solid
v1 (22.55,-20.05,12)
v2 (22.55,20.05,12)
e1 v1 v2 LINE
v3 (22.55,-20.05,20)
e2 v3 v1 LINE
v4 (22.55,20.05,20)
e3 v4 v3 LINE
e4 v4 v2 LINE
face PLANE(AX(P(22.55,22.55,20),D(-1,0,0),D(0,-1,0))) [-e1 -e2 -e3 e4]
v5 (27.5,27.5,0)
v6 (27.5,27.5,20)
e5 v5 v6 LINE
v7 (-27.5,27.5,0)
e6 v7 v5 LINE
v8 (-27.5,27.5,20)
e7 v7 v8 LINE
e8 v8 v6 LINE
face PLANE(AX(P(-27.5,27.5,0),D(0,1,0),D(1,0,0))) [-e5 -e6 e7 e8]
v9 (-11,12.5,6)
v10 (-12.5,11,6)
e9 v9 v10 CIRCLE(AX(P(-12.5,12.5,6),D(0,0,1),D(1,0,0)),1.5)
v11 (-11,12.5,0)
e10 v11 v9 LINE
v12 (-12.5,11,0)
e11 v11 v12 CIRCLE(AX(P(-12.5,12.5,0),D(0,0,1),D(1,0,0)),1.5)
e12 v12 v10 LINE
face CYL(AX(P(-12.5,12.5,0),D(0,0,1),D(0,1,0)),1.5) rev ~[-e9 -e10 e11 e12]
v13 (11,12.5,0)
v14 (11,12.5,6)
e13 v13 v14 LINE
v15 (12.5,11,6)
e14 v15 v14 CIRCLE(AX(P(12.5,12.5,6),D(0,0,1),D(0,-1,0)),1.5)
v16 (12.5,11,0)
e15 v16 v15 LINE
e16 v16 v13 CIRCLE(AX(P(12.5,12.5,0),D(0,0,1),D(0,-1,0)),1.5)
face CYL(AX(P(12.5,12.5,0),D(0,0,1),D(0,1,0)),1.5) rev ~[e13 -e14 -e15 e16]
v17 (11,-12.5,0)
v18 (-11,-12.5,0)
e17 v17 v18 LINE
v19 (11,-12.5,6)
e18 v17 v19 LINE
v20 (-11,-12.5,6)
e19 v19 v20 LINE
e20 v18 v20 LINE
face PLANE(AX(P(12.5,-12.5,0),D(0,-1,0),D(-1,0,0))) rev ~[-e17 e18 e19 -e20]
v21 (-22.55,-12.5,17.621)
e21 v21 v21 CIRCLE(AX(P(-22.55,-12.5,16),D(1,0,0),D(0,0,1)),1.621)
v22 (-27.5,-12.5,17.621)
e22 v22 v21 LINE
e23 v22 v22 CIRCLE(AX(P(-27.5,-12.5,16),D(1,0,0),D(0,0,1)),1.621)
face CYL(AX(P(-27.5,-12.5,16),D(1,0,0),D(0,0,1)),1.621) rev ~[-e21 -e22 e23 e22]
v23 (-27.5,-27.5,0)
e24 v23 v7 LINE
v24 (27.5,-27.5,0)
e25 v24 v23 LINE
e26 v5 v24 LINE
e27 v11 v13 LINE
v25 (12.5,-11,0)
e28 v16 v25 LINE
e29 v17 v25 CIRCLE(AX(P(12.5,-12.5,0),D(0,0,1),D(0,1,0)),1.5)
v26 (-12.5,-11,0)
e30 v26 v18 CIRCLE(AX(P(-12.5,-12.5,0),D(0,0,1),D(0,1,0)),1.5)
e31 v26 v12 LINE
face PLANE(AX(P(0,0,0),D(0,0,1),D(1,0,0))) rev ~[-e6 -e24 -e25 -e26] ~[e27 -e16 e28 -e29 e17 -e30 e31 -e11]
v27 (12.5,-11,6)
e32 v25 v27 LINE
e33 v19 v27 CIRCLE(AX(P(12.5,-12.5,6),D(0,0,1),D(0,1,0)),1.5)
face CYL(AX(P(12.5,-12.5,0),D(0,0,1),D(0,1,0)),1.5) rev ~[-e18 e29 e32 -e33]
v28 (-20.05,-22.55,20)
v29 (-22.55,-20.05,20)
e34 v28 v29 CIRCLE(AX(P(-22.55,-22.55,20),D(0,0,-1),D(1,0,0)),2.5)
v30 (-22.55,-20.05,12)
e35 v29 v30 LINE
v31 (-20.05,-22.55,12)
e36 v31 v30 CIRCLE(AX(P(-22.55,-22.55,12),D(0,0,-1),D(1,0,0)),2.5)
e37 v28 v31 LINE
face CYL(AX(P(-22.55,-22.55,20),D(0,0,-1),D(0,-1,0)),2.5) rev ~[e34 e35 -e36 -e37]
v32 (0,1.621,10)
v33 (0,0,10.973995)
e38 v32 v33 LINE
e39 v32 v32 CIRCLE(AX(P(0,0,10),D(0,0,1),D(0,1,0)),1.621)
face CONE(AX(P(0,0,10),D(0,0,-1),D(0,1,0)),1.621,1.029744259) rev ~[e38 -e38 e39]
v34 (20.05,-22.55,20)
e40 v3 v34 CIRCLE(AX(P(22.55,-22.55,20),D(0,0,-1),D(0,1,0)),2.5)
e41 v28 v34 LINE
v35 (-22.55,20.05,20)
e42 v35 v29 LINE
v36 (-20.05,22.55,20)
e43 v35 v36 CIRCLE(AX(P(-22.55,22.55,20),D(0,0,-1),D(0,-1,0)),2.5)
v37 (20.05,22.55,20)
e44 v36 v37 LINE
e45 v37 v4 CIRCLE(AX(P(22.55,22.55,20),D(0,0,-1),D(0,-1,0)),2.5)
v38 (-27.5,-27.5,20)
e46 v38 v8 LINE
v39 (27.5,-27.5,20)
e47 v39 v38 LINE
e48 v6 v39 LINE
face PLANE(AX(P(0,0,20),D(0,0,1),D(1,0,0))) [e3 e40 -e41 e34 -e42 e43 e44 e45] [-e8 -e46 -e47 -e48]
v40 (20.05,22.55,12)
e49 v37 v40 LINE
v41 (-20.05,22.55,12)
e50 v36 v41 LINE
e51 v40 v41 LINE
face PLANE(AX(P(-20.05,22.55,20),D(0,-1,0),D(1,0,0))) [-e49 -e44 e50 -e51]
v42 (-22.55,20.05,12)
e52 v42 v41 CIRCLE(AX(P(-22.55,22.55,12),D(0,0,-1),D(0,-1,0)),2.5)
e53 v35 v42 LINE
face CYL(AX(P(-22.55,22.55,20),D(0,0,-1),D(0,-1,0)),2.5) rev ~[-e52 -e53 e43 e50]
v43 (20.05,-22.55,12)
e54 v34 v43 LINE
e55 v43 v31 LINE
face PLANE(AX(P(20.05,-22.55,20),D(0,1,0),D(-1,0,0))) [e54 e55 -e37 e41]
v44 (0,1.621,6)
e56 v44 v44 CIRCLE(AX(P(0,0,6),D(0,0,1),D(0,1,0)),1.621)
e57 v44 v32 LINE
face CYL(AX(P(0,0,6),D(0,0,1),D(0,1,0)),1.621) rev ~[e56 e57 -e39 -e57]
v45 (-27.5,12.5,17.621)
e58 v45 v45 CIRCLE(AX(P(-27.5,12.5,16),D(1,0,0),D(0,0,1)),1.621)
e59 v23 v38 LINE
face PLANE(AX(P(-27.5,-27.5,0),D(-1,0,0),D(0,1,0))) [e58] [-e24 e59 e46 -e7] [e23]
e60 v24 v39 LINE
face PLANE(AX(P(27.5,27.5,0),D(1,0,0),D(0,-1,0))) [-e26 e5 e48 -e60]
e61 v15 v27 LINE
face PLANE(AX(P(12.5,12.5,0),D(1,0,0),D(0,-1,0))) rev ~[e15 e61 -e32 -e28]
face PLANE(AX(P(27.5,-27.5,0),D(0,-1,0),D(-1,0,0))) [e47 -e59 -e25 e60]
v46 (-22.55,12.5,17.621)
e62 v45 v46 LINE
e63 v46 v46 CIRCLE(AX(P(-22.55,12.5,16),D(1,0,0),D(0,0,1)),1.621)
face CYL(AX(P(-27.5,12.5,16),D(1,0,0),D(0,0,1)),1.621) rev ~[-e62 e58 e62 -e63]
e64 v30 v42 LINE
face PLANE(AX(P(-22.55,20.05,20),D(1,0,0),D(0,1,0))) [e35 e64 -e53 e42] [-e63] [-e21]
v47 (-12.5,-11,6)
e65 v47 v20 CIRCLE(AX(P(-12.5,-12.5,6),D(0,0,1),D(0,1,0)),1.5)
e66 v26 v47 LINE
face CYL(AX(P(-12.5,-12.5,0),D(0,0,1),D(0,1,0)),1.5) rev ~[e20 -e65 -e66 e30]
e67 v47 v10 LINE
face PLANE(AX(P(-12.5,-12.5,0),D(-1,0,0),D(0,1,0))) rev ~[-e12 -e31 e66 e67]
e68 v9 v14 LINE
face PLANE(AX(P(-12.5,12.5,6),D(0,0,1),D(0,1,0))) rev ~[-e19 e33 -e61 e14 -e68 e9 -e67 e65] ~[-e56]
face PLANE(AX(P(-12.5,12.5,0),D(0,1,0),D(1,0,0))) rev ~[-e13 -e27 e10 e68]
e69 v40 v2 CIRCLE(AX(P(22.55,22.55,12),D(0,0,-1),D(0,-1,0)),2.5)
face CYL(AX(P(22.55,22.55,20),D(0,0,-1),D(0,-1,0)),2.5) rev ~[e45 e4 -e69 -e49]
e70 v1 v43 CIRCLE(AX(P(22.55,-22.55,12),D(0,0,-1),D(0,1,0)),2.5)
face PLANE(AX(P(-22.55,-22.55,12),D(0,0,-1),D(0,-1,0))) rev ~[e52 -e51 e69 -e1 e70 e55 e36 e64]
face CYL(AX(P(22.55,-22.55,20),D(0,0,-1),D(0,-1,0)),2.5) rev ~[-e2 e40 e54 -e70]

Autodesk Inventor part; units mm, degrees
ref_plane "YZ Plane" through (0, 0, 0) normal (1, 0, 0) x (0, 1, 0)
ref_plane "XZ Plane" through (0, 0, 0) normal (0, 1, 0) x (-1, 0, 0)
ref_plane "XY Plane" through (0, 0, 0) normal (0, 0, 1) x (1, 0, 0)
sketch "Sketch1" plane through (0, 0, 0) normal (0, 0, 1) x (1, 0, 0)
  line L0 (0, 38.5) -> (0, -38.5) construction
  line L1 (-38.5, 0) -> (38.5, 0) construction
  line L2 (-27.5, 27.5) -> (27.5, 27.5)
  line L3 (27.5, 27.5) -> (27.5, -27.5)
  line L4 (27.5, -27.5) -> (-27.5, -27.5)
  line L5 (-27.5, -27.5) -> (-27.5, 27.5)
  point P0 (0, 0)
  dimension "d0" = 55
  dimension "d1" = 55
extrude "Extrusion1" add sketch "Sketch1" along normal blind 20
sketch "Sketch4" plane through (0, 0, 20) normal (0, 0, 1) x (1, 0, 0)
  line L0 (-38.5, 0) -> (38.5, 0) construction
  line L1 (0, 38.5) -> (0, -38.5) construction
  line L2 (-22.55, 22.55) -> (22.55, 22.55) construction
  line L3 (22.55, 22.55) -> (22.55, -22.55) construction
  line L4 (22.55, -22.55) -> (-22.55, -22.55) construction
  line L5 (-22.55, -22.55) -> (-22.55, 22.55) construction
  point P0 (0, 0)
  dimension "d15" = 45.1
  dimension "d16" = 45.1
hole "Hole2" at (-22.55, 22.55, 20) at (22.55, 22.55, 20) at (22.55, -22.55, 20) at (-22.55, -22.55, 20) at (-22.55, 22.55, 20) at (22.55, 22.55, 20) direction (0, 0, -1) diameter 5 depth 8
sketch "Sketch5" plane through (0, 0, 20) normal (0, 0, 1) x (1, 0, 0)
  circle A0 centre (-22.55, 22.55) radius 2.5 projected
  circle A1 centre (22.55, -22.55) radius 2.5 projected
  line L0 (-22.55, 22.55) -> (22.55, 22.55)
  line L1 (22.55, 22.55) -> (22.55, -22.55)
  line L2 (22.55, -22.55) -> (-22.55, -22.55)
  line L3 (-22.55, -22.55) -> (-22.55, 22.55)
  point P0 (0, 0)
extrude "Extrusion3" cut sketch "Sketch5" against normal blind 8 contours L0 L1 A1 L2 L3 A0 | A0 L3 L0 | L1 L2 A1 picked at (-20.9042, 22.3646) picked at (22.003, -20.9868)
sketch "Sketch6" plane through (-27.5, -27.5, 0) normal (-1, 0, 0) x (0, 0, 1)
  line L0 (0, 55) -> (20, 55) projected
  line L1 (0, 0) -> (20, 0) projected
  line L2 (20, 7.45) -> (12, 7.45) construction
  line L3 (20, 47.55) -> (20, 7.45) construction
  line L4 (12, 47.55) -> (20, 47.55) construction
  line L5 (12, 7.45) -> (12, 47.55) construction
  line L6 (16, 47.55) -> (16, 7.45) construction
  point P0 (0, 27.5)
  point P1 (16, 40)
  point P2 (16, 15)
  dimension "d26" = 15
  dimension "d27" = 15
hole "Hole3" at (-27.5, 12.5, 16) at (-27.5, -12.5, 16) direction (1, 0, 0) diameter 3.242 end up to surface thread size "M4x0.7" class "6H" standard "ANSI Metric M Profile"
sketch "Sketch8" plane through (0, 0, 0) normal (0, 0, -1) x (-1, 0, 0)
  line L0 (27.5, 27.5) -> (-27.5, 27.5) construction
  line L1 (-27.5, 27.5) -> (-27.5, -27.5) construction
  line L2 (-27.5, -27.5) -> (27.5, -27.5) construction
  line L3 (27.5, -27.5) -> (27.5, 27.5) construction
  line L4 (0, -38.5) -> (0, 38.5) construction
  line L5 (-38.5, 0) -> (38.5, 0) construction
  line L6 (-12.5, -12.5) -> (12.5, -12.5)
  line L7 (12.5, -12.5) -> (12.5, 12.5)
  line L8 (12.5, 12.5) -> (-12.5, 12.5)
  line L9 (-12.5, 12.5) -> (-12.5, -12.5)
  point P0 (0, 0)
  dimension "d44" = 25
  dimension "d45" = 25
extrude "Extrusion4" cut sketch "Sketch8" against normal blind 6
sketch "Sketch9" plane through (0, 0, 0) normal (0, 0, -1) x (-1, 0, 0)
  line L0 (12.5, 12.5) -> (12.5, -12.5) construction
  line L1 (12.5, -12.5) -> (-12.5, -12.5) construction
  line L2 (-12.5, -12.5) -> (-12.5, 12.5) construction
  line L3 (-12.5, 12.5) -> (12.5, 12.5) construction
  line L4 (27.5, 27.5) -> (-27.5, 27.5) construction
  line L5 (-27.5, 27.5) -> (-27.5, -27.5) construction
  line L6 (-27.5, -27.5) -> (27.5, -27.5) construction
  line L7 (27.5, -27.5) -> (27.5, 27.5) construction
  line L8 (12.5, -12.5) -> (-12.5, -12.5) construction
  point P0 (0, 0)
hole "Hole5" at (-12.5, 12.5, 0) at (-12.5, -12.5, 0) at (12.5, -12.5, 0) at (12.5, 12.5, 0) direction (0, 0, 1) diameter 3 depth 6
sketch "Sketch10" plane through (0, 0, 6) normal (0, 0, -1) x (-1, 0, 0)
  point P0 (0, 0)
  point P1 (0, 0)
hole "Hole6" at (0, 0, 6) direction (0, 0, 1) diameter 3.242 depth 4 tip angle 118 thread size "M4x0.7" class "6H" standard "ANSI Metric M Profile"
properties part number "Large-cuvette-mount-40mm-V3" material "PC/ABS Plastic"
